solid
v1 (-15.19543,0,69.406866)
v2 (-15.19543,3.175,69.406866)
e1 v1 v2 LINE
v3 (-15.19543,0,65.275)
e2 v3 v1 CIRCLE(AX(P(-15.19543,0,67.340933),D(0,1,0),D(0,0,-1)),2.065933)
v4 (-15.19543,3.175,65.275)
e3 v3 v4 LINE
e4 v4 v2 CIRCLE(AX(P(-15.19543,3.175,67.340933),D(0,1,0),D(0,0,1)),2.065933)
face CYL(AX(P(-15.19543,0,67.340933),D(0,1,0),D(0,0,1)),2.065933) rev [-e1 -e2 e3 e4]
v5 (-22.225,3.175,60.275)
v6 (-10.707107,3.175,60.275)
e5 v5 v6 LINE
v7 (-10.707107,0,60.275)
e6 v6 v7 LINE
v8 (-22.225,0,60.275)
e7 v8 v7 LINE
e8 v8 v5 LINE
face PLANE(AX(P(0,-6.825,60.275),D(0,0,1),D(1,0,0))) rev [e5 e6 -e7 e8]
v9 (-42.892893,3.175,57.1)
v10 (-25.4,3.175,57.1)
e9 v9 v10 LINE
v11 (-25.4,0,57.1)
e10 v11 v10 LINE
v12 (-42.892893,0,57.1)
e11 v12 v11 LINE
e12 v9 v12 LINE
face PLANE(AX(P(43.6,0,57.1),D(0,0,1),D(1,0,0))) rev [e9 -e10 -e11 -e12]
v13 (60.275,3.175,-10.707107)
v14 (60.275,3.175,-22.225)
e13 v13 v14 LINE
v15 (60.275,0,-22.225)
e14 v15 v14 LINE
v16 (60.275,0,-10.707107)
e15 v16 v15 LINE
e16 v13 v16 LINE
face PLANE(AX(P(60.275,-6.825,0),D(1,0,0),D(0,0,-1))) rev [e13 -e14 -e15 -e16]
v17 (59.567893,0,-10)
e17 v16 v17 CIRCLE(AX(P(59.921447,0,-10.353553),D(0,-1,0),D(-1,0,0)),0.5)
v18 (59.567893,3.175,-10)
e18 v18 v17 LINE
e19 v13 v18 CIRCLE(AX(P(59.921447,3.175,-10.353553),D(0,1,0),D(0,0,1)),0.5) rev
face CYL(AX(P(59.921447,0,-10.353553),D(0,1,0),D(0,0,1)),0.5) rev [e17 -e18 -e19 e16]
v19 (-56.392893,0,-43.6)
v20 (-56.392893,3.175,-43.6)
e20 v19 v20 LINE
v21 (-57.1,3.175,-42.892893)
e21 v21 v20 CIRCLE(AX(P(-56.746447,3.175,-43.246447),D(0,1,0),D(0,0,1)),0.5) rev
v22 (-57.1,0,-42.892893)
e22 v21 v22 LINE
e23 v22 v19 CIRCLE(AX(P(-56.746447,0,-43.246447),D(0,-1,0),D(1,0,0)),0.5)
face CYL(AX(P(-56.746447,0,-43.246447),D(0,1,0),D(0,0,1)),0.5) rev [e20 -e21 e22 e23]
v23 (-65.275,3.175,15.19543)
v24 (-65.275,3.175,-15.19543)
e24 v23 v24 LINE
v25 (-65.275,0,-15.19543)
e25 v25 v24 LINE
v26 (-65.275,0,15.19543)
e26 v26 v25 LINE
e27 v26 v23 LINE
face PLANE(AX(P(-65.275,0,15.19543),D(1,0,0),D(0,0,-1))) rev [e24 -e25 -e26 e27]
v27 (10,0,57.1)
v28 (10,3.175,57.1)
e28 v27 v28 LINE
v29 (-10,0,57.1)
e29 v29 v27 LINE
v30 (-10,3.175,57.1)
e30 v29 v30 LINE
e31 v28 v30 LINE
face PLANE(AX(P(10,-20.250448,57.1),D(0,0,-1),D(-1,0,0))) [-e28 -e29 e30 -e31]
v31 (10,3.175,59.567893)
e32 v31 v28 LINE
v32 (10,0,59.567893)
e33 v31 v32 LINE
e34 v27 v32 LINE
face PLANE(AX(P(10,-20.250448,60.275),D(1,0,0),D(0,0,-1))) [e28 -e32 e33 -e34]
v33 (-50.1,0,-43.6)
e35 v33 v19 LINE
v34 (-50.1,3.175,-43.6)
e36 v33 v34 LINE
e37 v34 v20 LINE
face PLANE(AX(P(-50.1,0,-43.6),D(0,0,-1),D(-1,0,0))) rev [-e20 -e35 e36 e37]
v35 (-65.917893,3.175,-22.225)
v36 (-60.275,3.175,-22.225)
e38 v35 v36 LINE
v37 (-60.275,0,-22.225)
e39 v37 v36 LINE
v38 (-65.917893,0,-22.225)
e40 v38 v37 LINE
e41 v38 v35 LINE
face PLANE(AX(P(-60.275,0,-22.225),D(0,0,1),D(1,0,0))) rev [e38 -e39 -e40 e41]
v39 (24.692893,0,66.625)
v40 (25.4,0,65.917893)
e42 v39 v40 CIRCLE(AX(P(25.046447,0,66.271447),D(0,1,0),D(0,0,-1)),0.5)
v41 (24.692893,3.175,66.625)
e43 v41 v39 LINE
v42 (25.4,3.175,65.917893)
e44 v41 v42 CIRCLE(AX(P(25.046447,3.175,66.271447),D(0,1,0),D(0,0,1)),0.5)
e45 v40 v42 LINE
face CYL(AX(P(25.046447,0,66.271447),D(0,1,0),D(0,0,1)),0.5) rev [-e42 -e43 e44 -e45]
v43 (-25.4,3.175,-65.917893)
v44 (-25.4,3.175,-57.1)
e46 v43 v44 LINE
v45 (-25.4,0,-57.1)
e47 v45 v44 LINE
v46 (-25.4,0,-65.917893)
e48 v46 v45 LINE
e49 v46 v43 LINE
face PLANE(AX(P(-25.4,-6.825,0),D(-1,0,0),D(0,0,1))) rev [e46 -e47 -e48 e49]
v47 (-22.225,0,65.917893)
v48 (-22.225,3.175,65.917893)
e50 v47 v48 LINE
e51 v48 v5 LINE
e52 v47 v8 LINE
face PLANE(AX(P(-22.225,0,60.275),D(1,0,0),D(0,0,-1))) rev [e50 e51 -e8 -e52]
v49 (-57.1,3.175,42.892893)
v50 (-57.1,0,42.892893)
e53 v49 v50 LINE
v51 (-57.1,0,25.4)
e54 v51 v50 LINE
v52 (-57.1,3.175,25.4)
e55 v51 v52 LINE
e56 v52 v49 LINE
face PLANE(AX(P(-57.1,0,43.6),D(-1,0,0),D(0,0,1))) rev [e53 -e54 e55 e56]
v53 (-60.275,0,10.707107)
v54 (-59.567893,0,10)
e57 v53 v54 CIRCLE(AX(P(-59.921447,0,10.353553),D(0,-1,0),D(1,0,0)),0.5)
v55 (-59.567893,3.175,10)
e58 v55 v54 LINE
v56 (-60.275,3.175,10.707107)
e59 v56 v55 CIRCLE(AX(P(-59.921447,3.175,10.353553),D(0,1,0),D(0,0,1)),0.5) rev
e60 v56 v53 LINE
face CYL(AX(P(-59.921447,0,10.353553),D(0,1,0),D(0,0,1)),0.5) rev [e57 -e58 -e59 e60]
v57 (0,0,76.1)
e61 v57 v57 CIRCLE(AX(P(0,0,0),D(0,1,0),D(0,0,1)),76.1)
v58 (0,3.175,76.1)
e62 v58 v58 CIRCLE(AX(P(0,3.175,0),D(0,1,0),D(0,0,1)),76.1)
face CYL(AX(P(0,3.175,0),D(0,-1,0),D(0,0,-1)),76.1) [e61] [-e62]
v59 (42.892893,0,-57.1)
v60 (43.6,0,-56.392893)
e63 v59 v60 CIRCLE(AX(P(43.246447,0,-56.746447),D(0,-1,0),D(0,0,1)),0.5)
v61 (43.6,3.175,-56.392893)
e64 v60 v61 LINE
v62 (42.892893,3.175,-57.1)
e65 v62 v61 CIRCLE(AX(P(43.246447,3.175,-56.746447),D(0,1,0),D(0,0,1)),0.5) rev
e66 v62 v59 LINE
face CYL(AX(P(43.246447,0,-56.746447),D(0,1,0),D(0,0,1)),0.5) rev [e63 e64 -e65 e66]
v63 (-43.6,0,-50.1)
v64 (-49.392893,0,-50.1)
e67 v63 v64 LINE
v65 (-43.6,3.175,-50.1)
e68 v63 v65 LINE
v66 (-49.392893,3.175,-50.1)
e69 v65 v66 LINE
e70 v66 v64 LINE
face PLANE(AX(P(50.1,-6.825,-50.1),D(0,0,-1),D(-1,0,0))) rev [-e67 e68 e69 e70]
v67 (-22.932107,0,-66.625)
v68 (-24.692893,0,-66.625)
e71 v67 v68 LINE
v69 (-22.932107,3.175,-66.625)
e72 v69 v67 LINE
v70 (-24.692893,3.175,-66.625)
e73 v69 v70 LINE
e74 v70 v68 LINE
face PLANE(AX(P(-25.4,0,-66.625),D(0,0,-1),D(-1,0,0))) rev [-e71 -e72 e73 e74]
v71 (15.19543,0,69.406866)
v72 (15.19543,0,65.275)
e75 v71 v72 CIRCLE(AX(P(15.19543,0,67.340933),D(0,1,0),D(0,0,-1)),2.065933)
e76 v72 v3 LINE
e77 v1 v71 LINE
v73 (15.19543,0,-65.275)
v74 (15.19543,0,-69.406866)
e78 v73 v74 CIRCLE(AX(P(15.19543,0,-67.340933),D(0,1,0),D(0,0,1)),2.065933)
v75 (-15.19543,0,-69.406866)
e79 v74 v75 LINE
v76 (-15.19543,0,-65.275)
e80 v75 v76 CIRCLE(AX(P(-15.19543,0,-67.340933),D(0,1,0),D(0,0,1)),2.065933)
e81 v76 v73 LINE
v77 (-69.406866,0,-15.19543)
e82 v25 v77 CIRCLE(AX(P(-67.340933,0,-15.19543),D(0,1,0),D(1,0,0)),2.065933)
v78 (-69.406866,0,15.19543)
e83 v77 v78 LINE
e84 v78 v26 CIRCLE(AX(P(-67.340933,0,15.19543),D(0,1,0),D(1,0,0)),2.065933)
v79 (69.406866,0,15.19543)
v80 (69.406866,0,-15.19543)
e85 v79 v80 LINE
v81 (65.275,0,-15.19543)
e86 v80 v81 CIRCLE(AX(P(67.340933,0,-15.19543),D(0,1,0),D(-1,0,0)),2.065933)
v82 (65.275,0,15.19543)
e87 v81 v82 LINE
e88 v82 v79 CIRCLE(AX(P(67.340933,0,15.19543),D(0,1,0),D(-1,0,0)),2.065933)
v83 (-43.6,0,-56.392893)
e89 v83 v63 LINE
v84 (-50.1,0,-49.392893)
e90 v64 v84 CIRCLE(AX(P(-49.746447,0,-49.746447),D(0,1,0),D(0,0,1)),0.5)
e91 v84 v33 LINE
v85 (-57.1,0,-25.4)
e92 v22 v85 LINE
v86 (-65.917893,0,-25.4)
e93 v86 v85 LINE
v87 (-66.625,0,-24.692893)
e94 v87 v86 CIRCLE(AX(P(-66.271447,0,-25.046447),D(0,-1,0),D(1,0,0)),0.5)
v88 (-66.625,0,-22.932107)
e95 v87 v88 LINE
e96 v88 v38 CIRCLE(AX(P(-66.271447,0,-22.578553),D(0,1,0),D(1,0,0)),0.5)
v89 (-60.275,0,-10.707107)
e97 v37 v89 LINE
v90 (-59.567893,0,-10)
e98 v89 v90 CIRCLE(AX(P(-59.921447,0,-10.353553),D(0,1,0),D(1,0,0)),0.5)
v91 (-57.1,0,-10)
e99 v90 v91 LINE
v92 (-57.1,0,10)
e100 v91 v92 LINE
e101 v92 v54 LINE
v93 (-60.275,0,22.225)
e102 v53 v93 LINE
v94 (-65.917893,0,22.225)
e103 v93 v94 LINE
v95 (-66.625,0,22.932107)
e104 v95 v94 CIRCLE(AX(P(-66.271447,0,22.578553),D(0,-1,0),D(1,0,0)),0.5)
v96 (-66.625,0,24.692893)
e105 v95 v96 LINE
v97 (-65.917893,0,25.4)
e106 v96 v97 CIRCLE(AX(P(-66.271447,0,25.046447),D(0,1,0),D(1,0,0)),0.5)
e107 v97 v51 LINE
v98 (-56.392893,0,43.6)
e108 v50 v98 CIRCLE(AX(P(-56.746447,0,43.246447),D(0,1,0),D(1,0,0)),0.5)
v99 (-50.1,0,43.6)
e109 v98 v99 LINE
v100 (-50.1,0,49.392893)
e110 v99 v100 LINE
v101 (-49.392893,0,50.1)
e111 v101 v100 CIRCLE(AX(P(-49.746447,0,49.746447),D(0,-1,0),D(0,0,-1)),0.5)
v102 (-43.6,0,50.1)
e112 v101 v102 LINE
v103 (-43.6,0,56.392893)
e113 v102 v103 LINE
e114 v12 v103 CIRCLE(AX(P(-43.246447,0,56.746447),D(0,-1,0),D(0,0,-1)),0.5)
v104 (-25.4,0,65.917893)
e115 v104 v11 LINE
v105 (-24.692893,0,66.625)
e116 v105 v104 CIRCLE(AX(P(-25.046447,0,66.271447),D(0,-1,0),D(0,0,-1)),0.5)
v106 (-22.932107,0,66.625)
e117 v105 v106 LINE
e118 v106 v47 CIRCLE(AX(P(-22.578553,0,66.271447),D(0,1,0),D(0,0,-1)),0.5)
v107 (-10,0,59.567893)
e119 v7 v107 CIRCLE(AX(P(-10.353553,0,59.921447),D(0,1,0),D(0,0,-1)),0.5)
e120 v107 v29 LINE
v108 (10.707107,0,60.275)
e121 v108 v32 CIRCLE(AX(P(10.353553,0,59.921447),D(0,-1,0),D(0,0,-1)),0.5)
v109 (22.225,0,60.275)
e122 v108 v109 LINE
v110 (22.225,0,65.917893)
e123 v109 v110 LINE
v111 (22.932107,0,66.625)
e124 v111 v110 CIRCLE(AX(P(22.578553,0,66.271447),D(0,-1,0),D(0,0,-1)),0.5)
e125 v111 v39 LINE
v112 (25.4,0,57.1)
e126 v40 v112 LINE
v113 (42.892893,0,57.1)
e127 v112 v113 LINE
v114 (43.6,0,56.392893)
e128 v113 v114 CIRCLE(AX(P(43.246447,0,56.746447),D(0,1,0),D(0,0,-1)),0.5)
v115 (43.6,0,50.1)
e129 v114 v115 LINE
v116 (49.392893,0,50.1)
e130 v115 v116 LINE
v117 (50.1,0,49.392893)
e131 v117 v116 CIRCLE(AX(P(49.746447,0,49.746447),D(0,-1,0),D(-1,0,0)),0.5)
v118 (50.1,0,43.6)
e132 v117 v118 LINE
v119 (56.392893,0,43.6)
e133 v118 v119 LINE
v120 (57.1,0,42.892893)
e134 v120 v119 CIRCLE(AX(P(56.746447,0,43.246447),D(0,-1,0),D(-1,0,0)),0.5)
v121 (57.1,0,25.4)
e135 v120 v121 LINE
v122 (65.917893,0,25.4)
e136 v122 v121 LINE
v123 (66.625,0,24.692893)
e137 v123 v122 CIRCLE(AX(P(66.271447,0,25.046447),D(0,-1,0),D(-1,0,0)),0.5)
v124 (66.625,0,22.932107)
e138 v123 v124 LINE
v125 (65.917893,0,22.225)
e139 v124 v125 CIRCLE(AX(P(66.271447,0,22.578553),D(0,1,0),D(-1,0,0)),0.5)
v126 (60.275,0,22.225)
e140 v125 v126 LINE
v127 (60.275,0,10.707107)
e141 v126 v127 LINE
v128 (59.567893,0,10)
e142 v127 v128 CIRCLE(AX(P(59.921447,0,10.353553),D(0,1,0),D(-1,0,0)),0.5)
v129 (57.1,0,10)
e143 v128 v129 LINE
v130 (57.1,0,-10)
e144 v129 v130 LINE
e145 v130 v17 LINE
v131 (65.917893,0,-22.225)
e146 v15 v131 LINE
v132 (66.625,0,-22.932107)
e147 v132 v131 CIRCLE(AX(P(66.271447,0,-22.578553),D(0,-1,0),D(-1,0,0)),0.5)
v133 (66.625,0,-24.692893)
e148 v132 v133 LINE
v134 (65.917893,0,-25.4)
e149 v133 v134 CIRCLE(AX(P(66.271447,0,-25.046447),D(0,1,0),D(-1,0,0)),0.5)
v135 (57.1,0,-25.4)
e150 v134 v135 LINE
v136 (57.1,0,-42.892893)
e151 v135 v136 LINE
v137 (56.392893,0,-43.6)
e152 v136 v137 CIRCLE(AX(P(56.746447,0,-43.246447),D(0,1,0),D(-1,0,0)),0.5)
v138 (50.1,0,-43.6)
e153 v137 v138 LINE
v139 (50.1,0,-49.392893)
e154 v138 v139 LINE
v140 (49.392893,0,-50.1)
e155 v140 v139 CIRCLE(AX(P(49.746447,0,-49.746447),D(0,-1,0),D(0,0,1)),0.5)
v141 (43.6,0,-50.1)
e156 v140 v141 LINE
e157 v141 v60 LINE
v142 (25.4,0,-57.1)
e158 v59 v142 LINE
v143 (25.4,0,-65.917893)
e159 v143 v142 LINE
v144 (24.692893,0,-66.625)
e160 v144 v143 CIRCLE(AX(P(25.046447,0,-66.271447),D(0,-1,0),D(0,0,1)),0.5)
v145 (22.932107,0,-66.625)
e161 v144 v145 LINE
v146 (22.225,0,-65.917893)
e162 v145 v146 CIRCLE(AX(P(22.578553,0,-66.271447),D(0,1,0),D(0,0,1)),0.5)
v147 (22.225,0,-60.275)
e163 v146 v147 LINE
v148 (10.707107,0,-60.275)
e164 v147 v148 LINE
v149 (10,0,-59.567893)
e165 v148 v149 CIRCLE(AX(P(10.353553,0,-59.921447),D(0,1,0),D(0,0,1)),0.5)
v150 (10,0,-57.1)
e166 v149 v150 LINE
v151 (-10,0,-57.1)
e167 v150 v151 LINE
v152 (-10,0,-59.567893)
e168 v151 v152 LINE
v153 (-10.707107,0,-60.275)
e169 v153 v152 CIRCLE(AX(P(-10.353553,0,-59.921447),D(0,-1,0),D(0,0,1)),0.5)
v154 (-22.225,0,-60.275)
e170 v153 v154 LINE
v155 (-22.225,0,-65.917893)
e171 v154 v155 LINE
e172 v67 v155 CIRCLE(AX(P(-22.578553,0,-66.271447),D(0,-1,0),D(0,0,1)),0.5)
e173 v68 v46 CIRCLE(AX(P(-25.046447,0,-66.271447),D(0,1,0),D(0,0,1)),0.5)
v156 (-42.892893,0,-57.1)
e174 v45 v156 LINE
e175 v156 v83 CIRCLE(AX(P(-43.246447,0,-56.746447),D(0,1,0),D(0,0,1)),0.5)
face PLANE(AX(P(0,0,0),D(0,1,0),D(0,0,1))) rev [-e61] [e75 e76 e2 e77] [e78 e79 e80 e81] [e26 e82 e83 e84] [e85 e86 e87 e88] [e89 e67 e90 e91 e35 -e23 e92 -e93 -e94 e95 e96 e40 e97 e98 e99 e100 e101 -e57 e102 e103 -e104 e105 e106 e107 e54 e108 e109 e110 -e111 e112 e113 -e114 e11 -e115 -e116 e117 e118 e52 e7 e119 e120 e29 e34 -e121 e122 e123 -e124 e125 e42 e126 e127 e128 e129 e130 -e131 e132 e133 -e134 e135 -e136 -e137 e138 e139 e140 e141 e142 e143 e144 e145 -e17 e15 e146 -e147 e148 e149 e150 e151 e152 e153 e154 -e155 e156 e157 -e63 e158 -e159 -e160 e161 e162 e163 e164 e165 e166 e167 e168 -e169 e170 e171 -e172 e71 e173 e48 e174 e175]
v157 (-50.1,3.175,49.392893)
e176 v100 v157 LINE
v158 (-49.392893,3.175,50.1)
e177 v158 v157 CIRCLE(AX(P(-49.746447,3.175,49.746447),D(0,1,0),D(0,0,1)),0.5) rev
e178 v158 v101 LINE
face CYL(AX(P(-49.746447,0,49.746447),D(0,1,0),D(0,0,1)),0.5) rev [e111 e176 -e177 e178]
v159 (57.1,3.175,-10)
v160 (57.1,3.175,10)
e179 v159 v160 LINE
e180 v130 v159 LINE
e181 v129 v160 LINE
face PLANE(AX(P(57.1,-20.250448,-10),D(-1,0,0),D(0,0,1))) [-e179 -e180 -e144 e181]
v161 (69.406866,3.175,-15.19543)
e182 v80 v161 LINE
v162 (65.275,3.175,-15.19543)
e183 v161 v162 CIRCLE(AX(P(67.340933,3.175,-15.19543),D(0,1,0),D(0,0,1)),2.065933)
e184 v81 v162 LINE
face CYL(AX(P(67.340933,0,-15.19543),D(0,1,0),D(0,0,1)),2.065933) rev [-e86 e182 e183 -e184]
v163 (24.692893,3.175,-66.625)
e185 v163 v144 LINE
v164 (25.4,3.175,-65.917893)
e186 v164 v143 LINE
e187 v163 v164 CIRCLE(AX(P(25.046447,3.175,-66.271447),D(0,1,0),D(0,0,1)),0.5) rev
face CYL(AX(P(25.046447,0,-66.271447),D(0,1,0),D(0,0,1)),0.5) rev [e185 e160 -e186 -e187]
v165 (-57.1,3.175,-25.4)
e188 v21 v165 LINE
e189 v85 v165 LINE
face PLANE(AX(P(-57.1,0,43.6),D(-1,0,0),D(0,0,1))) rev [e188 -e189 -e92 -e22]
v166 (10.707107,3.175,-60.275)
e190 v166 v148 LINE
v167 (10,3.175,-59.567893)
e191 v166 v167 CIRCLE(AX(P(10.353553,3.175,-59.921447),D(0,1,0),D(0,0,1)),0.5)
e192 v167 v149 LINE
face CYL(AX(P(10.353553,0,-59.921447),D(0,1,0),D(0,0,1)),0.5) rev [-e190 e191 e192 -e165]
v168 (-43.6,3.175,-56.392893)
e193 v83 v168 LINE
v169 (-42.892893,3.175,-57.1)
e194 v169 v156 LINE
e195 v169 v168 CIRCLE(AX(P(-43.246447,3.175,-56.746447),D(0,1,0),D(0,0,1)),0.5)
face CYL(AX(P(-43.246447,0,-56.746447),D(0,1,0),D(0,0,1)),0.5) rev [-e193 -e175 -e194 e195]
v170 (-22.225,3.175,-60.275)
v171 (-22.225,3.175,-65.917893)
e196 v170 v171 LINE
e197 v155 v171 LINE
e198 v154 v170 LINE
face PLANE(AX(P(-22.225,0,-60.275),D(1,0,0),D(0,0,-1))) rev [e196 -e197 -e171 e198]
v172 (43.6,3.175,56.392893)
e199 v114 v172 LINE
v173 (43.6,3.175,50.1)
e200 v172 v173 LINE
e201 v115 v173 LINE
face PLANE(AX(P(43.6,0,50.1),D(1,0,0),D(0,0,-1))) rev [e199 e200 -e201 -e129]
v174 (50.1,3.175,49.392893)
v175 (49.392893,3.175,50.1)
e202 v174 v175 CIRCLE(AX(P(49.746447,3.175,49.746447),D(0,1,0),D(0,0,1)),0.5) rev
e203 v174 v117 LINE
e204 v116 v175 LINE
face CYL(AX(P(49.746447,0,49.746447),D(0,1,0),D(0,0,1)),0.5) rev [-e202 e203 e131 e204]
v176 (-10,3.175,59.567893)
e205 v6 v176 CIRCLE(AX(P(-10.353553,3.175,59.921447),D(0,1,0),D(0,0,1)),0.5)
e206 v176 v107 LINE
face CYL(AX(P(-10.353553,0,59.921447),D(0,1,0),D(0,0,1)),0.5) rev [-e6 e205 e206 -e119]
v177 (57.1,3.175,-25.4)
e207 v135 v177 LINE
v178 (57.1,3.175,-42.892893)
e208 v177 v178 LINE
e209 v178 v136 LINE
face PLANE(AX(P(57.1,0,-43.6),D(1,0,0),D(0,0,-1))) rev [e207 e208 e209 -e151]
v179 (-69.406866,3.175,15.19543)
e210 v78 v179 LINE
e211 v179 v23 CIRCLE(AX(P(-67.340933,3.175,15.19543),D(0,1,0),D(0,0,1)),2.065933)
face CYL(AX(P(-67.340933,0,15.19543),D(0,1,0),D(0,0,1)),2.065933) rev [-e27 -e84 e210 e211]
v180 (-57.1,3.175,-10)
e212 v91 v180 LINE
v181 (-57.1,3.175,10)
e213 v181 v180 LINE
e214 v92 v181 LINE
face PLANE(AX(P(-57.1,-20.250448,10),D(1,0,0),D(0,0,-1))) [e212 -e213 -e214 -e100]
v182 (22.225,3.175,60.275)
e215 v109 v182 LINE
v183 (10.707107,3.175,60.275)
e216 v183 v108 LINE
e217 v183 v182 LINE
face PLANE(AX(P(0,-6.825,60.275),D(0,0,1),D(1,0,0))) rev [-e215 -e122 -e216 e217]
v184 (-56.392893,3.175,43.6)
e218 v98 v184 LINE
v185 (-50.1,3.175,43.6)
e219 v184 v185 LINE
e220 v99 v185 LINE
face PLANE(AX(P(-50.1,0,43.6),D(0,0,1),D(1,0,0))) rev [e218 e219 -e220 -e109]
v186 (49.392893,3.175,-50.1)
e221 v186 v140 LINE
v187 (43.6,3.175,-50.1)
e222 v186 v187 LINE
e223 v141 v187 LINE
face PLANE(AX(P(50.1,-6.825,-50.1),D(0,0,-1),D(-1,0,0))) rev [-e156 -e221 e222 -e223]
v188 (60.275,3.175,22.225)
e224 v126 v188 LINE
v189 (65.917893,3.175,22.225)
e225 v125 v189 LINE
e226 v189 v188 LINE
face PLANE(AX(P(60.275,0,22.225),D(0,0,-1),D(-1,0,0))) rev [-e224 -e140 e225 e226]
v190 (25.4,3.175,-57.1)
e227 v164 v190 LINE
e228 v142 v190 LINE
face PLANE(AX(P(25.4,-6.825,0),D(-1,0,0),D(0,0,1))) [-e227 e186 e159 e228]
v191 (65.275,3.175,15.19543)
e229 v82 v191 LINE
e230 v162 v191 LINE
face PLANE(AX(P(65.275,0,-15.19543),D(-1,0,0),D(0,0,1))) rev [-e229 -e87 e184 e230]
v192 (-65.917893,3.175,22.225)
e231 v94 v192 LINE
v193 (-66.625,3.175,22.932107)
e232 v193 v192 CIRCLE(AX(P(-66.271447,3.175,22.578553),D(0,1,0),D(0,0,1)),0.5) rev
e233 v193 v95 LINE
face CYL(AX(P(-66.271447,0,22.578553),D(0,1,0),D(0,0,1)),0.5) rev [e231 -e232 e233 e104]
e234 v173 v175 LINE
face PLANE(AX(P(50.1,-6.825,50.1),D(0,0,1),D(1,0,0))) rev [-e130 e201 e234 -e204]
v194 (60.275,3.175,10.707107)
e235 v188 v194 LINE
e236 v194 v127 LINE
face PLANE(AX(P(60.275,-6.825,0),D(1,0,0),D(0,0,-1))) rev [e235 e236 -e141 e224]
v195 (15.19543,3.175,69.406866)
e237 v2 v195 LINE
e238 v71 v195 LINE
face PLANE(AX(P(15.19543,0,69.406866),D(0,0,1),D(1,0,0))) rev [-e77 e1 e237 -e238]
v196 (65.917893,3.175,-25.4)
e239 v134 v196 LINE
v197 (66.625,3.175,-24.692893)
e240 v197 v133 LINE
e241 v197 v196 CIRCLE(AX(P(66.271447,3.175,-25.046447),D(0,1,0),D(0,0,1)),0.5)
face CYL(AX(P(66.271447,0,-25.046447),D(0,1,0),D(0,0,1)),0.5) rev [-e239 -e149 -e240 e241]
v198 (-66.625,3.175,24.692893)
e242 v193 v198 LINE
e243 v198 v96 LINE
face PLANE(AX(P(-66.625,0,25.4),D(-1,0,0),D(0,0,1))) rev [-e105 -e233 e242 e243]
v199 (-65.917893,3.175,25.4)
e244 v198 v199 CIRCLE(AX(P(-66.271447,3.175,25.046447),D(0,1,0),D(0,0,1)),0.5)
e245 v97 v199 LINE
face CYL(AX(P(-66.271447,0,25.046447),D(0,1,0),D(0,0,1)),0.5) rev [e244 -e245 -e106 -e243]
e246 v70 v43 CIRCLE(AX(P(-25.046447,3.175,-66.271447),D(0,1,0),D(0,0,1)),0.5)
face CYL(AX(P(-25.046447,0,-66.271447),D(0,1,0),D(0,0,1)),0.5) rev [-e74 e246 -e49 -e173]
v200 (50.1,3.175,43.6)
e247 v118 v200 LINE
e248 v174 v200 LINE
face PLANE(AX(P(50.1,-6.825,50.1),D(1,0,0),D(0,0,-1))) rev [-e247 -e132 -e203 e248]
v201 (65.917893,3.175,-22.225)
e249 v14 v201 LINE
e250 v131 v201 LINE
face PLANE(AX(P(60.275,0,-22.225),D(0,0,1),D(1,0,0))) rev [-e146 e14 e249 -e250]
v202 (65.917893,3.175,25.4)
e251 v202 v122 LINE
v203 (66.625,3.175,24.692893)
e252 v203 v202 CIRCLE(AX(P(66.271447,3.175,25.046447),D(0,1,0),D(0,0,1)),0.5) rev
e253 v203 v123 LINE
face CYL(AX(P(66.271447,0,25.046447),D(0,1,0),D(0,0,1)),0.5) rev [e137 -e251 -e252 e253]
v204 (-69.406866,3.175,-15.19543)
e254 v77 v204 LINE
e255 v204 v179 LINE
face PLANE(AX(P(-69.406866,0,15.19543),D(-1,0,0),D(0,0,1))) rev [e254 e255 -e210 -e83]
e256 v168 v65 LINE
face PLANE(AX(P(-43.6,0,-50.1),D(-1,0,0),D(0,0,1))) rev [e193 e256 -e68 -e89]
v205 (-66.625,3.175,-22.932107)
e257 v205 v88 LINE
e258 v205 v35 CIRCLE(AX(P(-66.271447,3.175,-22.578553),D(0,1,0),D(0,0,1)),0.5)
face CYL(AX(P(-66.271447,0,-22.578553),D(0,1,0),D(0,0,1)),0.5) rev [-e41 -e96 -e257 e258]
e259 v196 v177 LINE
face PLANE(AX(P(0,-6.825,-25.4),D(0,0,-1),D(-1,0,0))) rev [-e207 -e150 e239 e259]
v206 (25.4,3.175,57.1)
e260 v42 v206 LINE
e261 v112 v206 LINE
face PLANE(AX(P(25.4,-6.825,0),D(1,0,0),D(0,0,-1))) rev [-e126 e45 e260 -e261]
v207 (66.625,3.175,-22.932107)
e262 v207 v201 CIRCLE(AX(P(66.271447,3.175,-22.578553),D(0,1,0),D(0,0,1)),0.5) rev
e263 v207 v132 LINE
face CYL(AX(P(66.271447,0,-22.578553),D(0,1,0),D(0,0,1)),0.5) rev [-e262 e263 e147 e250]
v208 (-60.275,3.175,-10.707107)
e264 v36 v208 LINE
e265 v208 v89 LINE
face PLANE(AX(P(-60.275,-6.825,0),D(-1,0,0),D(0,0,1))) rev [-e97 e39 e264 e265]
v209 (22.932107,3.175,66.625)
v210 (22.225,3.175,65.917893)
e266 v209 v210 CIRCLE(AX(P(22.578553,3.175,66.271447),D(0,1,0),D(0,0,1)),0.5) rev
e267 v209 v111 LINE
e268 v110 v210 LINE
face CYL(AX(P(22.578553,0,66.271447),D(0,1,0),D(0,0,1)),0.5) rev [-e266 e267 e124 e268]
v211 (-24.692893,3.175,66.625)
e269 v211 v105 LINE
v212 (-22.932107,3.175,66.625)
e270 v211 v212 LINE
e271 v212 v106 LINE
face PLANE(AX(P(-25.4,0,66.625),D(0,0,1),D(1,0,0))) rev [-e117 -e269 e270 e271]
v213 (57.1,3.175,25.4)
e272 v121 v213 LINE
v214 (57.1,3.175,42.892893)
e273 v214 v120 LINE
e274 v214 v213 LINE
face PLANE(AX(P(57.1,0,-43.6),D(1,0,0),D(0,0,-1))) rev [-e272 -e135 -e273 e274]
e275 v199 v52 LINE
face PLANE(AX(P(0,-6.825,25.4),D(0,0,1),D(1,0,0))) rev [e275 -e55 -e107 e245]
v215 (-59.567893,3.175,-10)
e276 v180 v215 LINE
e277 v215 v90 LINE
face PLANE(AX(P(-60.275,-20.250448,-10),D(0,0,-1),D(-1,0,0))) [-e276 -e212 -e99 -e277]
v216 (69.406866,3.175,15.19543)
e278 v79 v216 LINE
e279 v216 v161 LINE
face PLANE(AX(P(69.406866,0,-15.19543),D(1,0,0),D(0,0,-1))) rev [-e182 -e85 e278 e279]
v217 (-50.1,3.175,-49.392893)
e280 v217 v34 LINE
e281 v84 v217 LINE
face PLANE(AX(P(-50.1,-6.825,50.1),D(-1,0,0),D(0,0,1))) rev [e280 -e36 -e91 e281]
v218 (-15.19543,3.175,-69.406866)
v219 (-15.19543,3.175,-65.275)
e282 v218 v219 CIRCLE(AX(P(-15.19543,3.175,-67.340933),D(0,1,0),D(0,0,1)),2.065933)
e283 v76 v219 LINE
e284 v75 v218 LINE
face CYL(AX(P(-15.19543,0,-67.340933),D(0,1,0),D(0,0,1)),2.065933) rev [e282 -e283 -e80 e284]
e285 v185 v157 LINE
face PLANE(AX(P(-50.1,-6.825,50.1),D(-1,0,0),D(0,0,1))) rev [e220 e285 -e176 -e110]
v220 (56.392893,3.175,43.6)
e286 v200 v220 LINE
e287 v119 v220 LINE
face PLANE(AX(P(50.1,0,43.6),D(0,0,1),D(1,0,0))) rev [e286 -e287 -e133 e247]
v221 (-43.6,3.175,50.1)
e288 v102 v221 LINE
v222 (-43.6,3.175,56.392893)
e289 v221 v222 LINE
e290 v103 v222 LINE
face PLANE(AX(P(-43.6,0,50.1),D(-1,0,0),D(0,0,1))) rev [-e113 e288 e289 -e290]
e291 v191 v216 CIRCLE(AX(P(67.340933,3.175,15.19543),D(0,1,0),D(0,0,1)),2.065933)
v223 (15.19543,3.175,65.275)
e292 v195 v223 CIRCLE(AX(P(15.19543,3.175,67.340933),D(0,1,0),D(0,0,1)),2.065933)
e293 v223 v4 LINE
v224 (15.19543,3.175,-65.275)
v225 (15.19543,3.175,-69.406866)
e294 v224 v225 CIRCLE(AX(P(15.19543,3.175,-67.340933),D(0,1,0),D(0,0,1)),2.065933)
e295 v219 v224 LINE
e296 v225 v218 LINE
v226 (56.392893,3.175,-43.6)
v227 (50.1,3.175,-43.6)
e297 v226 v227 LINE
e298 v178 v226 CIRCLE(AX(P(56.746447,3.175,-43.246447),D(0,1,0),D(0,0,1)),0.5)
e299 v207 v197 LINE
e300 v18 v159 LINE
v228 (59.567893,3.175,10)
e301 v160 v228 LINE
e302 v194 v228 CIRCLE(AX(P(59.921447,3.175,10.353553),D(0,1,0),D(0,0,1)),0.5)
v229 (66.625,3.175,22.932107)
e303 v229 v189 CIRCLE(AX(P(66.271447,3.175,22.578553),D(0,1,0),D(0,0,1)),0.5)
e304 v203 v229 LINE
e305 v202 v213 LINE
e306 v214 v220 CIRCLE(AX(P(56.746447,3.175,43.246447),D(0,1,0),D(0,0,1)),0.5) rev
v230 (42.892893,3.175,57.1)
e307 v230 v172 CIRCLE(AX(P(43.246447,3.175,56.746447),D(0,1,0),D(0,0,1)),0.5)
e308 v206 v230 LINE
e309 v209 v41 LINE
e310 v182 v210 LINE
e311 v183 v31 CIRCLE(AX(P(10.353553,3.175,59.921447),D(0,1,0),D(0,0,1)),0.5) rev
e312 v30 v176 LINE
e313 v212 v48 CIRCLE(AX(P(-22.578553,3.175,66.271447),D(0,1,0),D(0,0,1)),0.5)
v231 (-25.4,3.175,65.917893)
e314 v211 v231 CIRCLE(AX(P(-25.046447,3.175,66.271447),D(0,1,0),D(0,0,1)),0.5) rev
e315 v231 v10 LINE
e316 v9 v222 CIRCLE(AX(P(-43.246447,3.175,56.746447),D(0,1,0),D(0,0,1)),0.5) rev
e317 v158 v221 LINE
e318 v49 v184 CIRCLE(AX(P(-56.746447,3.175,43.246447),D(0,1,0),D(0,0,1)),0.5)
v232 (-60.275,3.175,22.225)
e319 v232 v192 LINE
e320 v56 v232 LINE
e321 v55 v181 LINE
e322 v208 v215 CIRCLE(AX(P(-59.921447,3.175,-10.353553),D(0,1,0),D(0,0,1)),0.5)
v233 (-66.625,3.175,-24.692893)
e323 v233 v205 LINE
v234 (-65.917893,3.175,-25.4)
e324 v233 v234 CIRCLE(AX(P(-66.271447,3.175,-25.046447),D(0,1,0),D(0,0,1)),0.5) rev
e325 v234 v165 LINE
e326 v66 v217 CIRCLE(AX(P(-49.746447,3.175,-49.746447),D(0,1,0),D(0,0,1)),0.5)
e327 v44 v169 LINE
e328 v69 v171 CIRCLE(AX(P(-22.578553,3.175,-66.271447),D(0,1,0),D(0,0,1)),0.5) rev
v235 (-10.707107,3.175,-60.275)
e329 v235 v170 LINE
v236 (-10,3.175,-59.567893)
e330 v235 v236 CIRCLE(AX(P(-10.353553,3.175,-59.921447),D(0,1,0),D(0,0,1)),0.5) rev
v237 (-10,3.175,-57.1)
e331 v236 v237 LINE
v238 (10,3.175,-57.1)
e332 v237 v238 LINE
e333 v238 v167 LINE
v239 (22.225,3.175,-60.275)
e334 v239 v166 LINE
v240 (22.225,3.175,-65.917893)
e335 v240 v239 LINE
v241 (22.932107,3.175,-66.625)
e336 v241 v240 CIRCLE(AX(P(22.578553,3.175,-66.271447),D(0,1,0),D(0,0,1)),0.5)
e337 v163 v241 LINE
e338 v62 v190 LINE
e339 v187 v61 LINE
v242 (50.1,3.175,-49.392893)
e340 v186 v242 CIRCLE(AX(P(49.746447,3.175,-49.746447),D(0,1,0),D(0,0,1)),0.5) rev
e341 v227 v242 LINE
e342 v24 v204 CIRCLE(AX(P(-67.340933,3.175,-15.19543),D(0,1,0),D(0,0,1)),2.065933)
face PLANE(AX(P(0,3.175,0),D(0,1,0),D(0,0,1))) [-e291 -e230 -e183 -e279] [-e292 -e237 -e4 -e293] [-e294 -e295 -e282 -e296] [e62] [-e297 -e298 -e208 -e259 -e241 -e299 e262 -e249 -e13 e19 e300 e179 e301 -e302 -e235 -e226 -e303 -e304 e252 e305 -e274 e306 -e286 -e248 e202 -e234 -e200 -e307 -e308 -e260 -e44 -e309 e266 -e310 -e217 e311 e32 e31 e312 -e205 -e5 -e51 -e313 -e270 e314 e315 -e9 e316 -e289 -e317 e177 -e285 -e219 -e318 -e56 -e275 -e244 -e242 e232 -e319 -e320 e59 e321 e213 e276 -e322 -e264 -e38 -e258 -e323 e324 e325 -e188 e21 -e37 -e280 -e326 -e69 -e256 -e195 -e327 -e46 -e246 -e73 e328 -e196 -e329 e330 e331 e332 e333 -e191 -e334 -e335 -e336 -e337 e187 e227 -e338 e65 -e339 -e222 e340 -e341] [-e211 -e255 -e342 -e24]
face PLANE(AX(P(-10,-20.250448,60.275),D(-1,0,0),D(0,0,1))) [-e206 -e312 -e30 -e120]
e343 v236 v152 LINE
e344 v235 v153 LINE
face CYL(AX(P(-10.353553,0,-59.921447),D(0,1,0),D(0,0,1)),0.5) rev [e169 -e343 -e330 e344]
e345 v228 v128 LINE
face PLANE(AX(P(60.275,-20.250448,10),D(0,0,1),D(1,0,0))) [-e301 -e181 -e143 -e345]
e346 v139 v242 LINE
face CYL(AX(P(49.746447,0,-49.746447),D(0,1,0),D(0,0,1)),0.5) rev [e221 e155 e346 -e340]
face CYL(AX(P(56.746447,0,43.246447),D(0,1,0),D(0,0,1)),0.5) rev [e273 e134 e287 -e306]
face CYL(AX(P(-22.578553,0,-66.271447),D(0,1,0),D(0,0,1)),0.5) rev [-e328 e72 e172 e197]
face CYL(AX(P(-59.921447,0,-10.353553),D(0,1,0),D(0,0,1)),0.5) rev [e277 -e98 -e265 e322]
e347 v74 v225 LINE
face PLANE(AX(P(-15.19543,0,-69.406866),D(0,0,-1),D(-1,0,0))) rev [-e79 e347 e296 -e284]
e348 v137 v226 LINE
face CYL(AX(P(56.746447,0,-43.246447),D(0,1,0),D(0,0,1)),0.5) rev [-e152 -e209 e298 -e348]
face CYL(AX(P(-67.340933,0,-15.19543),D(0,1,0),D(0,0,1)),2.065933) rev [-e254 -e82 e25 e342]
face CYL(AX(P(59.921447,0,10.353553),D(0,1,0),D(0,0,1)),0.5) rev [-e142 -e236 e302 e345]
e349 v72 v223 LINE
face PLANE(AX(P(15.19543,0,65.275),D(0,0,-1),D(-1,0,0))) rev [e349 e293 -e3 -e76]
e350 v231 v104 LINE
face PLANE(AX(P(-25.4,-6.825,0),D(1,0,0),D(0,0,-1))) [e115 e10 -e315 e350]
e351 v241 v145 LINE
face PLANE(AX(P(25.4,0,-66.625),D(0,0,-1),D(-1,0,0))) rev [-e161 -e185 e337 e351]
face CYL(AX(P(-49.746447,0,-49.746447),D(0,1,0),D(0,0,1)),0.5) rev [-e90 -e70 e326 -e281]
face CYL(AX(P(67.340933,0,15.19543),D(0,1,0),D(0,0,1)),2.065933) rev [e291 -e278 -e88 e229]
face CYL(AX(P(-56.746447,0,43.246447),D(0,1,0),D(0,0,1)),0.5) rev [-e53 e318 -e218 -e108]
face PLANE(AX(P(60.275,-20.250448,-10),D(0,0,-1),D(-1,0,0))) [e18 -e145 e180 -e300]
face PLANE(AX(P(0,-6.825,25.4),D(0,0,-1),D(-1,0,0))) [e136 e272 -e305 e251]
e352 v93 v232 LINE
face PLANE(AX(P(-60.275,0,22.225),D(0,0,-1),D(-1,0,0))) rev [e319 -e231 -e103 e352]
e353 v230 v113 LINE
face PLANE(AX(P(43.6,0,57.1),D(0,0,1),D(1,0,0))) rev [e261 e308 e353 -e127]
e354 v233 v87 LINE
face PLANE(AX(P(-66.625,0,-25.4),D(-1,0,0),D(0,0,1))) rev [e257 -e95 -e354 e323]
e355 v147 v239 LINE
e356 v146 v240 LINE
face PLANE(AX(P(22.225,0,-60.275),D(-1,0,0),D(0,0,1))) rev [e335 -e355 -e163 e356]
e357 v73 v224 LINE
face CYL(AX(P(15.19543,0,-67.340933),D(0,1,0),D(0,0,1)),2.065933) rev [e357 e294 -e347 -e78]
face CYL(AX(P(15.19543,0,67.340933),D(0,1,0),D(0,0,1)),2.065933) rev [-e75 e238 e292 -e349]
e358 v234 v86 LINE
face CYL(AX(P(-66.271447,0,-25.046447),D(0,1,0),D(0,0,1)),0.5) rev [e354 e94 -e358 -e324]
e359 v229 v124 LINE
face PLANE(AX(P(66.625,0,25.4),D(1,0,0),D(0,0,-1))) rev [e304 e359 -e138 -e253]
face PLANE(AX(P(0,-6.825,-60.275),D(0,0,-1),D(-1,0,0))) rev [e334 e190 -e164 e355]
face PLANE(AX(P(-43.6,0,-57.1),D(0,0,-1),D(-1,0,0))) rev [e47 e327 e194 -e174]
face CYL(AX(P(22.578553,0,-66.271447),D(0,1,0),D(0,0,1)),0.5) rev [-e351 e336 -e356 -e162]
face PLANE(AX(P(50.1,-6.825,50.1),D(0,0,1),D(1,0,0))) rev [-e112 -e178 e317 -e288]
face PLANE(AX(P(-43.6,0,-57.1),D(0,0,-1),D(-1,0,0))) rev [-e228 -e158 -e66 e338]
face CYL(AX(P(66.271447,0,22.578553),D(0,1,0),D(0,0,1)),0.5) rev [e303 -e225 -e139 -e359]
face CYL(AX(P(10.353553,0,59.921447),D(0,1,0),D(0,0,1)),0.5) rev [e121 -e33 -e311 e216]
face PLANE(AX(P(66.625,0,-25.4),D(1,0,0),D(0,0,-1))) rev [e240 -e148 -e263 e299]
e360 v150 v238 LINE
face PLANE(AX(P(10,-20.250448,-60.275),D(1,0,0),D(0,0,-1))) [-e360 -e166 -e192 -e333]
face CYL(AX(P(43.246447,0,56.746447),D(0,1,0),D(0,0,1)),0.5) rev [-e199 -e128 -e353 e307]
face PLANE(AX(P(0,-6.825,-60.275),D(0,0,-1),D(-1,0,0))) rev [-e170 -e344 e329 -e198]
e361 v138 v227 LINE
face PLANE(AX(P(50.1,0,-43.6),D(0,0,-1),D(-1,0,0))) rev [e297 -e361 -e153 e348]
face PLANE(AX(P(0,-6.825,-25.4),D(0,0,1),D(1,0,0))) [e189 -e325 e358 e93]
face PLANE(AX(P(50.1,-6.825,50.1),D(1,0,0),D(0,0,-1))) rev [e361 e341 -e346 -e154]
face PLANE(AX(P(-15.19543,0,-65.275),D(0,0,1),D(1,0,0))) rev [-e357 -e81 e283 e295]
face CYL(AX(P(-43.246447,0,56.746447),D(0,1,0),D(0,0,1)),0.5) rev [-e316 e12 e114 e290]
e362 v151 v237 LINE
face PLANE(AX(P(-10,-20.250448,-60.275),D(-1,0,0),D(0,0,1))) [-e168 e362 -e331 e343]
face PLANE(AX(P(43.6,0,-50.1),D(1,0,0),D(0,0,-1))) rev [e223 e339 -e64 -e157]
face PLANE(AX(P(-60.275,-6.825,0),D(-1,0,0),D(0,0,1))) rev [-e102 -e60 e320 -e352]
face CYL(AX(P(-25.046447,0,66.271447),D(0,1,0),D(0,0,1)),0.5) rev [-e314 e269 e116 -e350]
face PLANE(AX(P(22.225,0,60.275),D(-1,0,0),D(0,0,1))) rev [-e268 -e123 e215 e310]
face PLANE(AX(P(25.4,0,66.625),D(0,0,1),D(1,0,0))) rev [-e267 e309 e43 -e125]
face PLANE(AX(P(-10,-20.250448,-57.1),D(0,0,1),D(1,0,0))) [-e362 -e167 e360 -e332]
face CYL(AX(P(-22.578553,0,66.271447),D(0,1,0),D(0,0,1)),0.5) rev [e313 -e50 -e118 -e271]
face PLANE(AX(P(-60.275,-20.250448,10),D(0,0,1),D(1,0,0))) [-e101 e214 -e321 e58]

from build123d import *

# Parameters (mm, degrees)
SKETCH1_R                   = 76.1
BOSS_EXTRUDE1_DEPTH         = 3.175
SKETCH6_W                   = 100.2
SKETCH6_H                   = 100.2
RAILCUTOUT_DEPTH            = 10
SKETCH12_W                  = 87.2
SKETCH12_H                  = 7
SOLARCUTOUTS_DEPTH          = 108.66847554
SKETCH17_W                  = 50.8
SKETCH17_H                  = 3.175
WALLCUTOUT_DEPTH            = 10
SKETCH26_W                  = 20
SKETCH26_H                  = 3.175
BOSS_EXTRUDE5_DEPTH         = 3.175
SKETCH23_W                  = 3.175
SKETCH23_H                  = 6.35
RIBHOLES_DEPTH              = 108.66847554
WIREHOLE_DEPTH              = 108.66847554
SKETCH21_R                  = 0.5
BONESEED_DEPTH              = 108.66847554
SKETCH_PATTERN1_DEPTH       = 3.175
CIRPATTERN1_COUNT           = 4
CIRPATTERN1_COPY_1_SKETCH_R = 0.5
CIRPATTERN1_COPY_1_DEPTH    = 108.66847554
CIRPATTERN1_COPY_2_SKETCH_R = 0.5
CIRPATTERN1_COPY_2_DEPTH    = 108.66847554
CIRPATTERN1_COPY_3_SKETCH_R = 0.5
CIRPATTERN1_COPY_3_DEPTH    = 108.66847554
CIRPATTERN1_COPY_4_DEPTH    = 3.175
CIRPATTERN1_COPY_5_DEPTH    = 3.175
CIRPATTERN1_COPY_6_DEPTH    = 3.175
CIRPATTERN1_COPY_7_SKETCH_R = 0.5
CIRPATTERN1_COPY_7_DEPTH    = 108.66847554
CIRPATTERN1_COPY_8_SKETCH_R = 0.5
CIRPATTERN1_COPY_8_DEPTH    = 108.66847554
CIRPATTERN1_COPY_9_SKETCH_R = 0.5
CIRPATTERN1_COPY_9_DEPTH    = 108.66847554


# Read off the part's stored shape, not the designer's step: Sketch-Pattern1
with BuildPart() as part:
    # Sketch1 → Boss-Extrude1 (new body)
    with BuildSketch(Plane(origin=(0, 0, 0), x_dir=(1, 0, 0), z_dir=(0, 1, 0))):
        with Locations(Location((0, 0, 0), (0, 0, 270))):
            Circle(SKETCH1_R)
    extrude(amount=BOSS_EXTRUDE1_DEPTH)

    # Sketch6 → railCutout (cut)
    with BuildSketch(Plane(origin=(0, 3.175, 0), x_dir=(1, 0, 0), z_dir=(0, 1, 0))):
        Rectangle(SKETCH6_W, SKETCH6_H)
    extrude(amount=-RAILCUTOUT_DEPTH, mode=Mode.SUBTRACT)

    # Sketch12 → solarCutouts (cut, symmetric)
    with BuildSketch(Plane(origin=(0, 3.175, 0), x_dir=(1, 0, 0), z_dir=(0, 1, 0))):
        with Locations((0, 53.6)):
            Rectangle(SKETCH12_W, SKETCH12_H)
    solarcutouts = extrude(amount=SOLARCUTOUTS_DEPTH, both=True, mode=Mode.SUBTRACT)

    # Sketch17 → wallCutout (cut)
    with BuildSketch(Plane(origin=(0, 3.175, 0), x_dir=(1, 0, 0), z_dir=(0, 1, 0))):
        with Locations((0, 58.6875)):
            Rectangle(SKETCH17_W, SKETCH17_H)
    wallcutout = extrude(amount=-WALLCUTOUT_DEPTH, mode=Mode.SUBTRACT)

    # Sketch26 → Boss-Extrude5 (add)
    with BuildSketch(Plane(origin=(0, 3.175, 0), x_dir=(1, 0, 0), z_dir=(0, 1, 0))):
        with Locations((0, 58.6875)):
            Rectangle(SKETCH26_W, SKETCH26_H)
    boss_extrude5 = extrude(amount=-BOSS_EXTRUDE5_DEPTH)

    # Sketch23 → ribHoles (cut, symmetric)
    with BuildSketch(Plane(origin=(0, 3.175, 0), x_dir=(1, 0, 0), z_dir=(0, 1, 0))):
        with Locations((-23.8125, 63.45)):
            Rectangle(SKETCH23_W, SKETCH23_H)
        with Locations((23.8125, 63.45)):
            Rectangle(SKETCH23_W, SKETCH23_H)
    ribholes = extrude(amount=RIBHOLES_DEPTH, both=True, mode=Mode.SUBTRACT)

    # Sketch22 → wireHole (cut, symmetric)
    with BuildSketch(Plane(origin=(0, 3.175, 0), x_dir=(1, 0, 0), z_dir=(0, 1, 0))):
        with BuildLine():
            Line((-15.19543021, 69.406866366), (15.19543021, 69.406866366))
            ThreePointArc((15.19543021, 69.406866366), (17.261363394, 67.340933183), (15.19543021, 65.275))
            Line((15.19543021, 65.275), (-15.19543021, 65.275))
            ThreePointArc((-15.19543021, 65.275), (-17.261363394, 67.340933183), (-15.19543021, 69.406866366))
        make_face()
    wirehole = extrude(amount=WIREHOLE_DEPTH, both=True, mode=Mode.SUBTRACT)

    # Sketch21 → boneSeed (cut, symmetric)
    with BuildSketch(Plane(origin=(0, 3.175, 0), x_dir=(1, 0, 0), z_dir=(0, 1, 0))):
        with Locations((-49.746446609, 49.746446609)):
            Circle(SKETCH21_R)
    boneseed = extrude(amount=BONESEED_DEPTH, both=True, mode=Mode.SUBTRACT)

    # Sketch-Pattern1 outline → Sketch-Pattern1 (cut)
    with BuildSketch(Plane(origin=(0, 0, 0), x_dir=(1, 0, 0), z_dir=(0, 1, 0))):
        with BuildLine():
            Line((-25.4, 66.625), (-24.692893219, 66.625))
            ThreePointArc((-24.692893219, 66.625), (-25.046446609, 66.771446609), (-25.4, 66.625))
        make_face()
        with BuildLine():
            Line((-43.6, 56.392893219), (-43.6, 57.1))
            ThreePointArc((-43.6, 57.1), (-43.746446609, 56.746446609), (-43.6, 56.392893219))
        make_face()
        with BuildLine():
            Line((-43.6, 57.1), (-42.892893219, 57.1))
            ThreePointArc((-42.892893219, 57.1), (-43.246446609, 57.246446609), (-43.6, 57.1))
        make_face()
        with BuildLine():
            Line((-25.4, 65.917893219), (-25.4, 66.625))
            ThreePointArc((-25.4, 66.625), (-25.546446609, 66.27144661), (-25.4, 65.917893219))
        make_face()
        with BuildLine():
            Line((22.225, 66.625), (22.932106781, 66.625))
            ThreePointArc((22.932106781, 66.625), (22.578553391, 66.771446609), (22.225, 66.625))
        make_face()
        with BuildLine():
            Line((10, 59.567893219), (10, 60.275))
            ThreePointArc((10, 60.275), (9.853553391, 59.921446609), (10, 59.567893219))
        make_face()
        with BuildLine():
            Line((10, 60.275), (10.707106781, 60.275))
            ThreePointArc((10.707106781, 60.275), (10.353553391, 60.421446609), (10, 60.275))
        make_face()
        with BuildLine():
            Line((22.225, 65.917893219), (22.225, 66.625))
            ThreePointArc((22.225, 66.625), (22.078553391, 66.27144661), (22.225, 65.917893219))
        make_face()
    sketch_pattern1 = extrude(amount=SKETCH_PATTERN1_DEPTH, mode=Mode.SUBTRACT)

    # Mirror1: boneSeed, Sketch-Pattern1 across plane
    add(boneseed.mirror(Plane(origin=(0, 0, 0), x_dir=(0, 0, 1), z_dir=(1, 0, 0))), mode=Mode.SUBTRACT)
    add(sketch_pattern1.mirror(Plane(origin=(0, 0, 0), x_dir=(0, 0, 1), z_dir=(1, 0, 0))), mode=Mode.SUBTRACT)

    # CirPattern1: solarCutouts, wallCutout, Boss-Extrude5, ribHoles, wireHole, Sketch-Pattern1 ×4 about axis
    cirpattern1_axis = Axis((0, 0, 0), (0, 1, 0))
    add([solarcutouts.rotate(cirpattern1_axis, i * 360 / CIRPATTERN1_COUNT) for i in range(1, CIRPATTERN1_COUNT)], mode=Mode.SUBTRACT)
    add([wallcutout.rotate(cirpattern1_axis, i * 360 / CIRPATTERN1_COUNT) for i in range(1, CIRPATTERN1_COUNT)], mode=Mode.SUBTRACT)
    add([boss_extrude5.rotate(cirpattern1_axis, i * 360 / CIRPATTERN1_COUNT) for i in range(1, CIRPATTERN1_COUNT)])
    add([ribholes.rotate(cirpattern1_axis, i * 360 / CIRPATTERN1_COUNT) for i in range(1, CIRPATTERN1_COUNT)], mode=Mode.SUBTRACT)
    add([wirehole.rotate(cirpattern1_axis, i * 360 / CIRPATTERN1_COUNT) for i in range(1, CIRPATTERN1_COUNT)], mode=Mode.SUBTRACT)
    add([sketch_pattern1.rotate(cirpattern1_axis, i * 360 / CIRPATTERN1_COUNT) for i in range(1, CIRPATTERN1_COUNT)], mode=Mode.SUBTRACT)

    # CirPattern1 copy 1 sketch → CirPattern1 copy 1 (cut, symmetric)
    with BuildSketch(Plane.ZX.offset(3.175)):
        with Locations((-49.746446609, -49.746446609)):
            Circle(CIRPATTERN1_COPY_1_SKETCH_R)
    extrude(amount=CIRPATTERN1_COPY_1_DEPTH, both=True, mode=Mode.SUBTRACT)

    # CirPattern1 copy 2 sketch → CirPattern1 copy 2 (cut, symmetric)
    with BuildSketch(Plane(origin=(0, 3.175, 0), x_dir=(1, 0, 0), z_dir=(0, 1, 0))):
        with Locations((-49.746446609, -49.746446609)):
            Circle(CIRPATTERN1_COPY_2_SKETCH_R)
    extrude(amount=CIRPATTERN1_COPY_2_DEPTH, both=True, mode=Mode.SUBTRACT)

    # CirPattern1 copy 3 sketch → CirPattern1 copy 3 (cut, symmetric)
    with BuildSketch(Plane(origin=(0, 3.175, 0), x_dir=(0, 0, -1), z_dir=(0, 1, 0))):
        with Locations((-49.746446609, -49.746446609)):
            Circle(CIRPATTERN1_COPY_3_SKETCH_R)
    extrude(amount=CIRPATTERN1_COPY_3_DEPTH, both=True, mode=Mode.SUBTRACT)

    # CirPattern1 copy 4 sketch → CirPattern1 copy 4 (cut)
    with BuildSketch(Plane.ZX):
        with BuildLine():
            Line((-25.4, -66.625), (-24.692893219, -66.625))
            ThreePointArc((-24.692893219, -66.625), (-25.046446609, -66.771446609), (-25.4, -66.625))
        make_face()
        with BuildLine():
            Line((-43.6, -56.392893219), (-43.6, -57.1))
            ThreePointArc((-43.6, -57.1), (-43.746446609, -56.746446609), (-43.6, -56.392893219))
        make_face()
        with BuildLine():
            Line((-43.6, -57.1), (-42.892893219, -57.1))
            ThreePointArc((-42.892893219, -57.1), (-43.246446609, -57.246446609), (-43.6, -57.1))
        make_face()
        with BuildLine():
            Line((-25.4, -65.917893219), (-25.4, -66.625))
            ThreePointArc((-25.4, -66.625), (-25.546446609, -66.27144661), (-25.4, -65.917893219))
        make_face()
        with BuildLine():
            Line((22.225, -66.625), (22.932106781, -66.625))
            ThreePointArc((22.932106781, -66.625), (22.578553391, -66.771446609), (22.225, -66.625))
        make_face()
        with BuildLine():
            Line((10, -59.567893219), (10, -60.275))
            ThreePointArc((10, -60.275), (9.853553391, -59.921446609), (10, -59.567893219))
        make_face()
        with BuildLine():
            Line((10, -60.275), (10.707106781, -60.275))
            ThreePointArc((10.707106781, -60.275), (10.353553391, -60.421446609), (10, -60.275))
        make_face()
        with BuildLine():
            Line((22.225, -65.917893219), (22.225, -66.625))
            ThreePointArc((22.225, -66.625), (22.078553391, -66.27144661), (22.225, -65.917893219))
        make_face()
    extrude(amount=CIRPATTERN1_COPY_4_DEPTH, mode=Mode.SUBTRACT)

    # CirPattern1 copy 5 sketch → CirPattern1 copy 5 (cut)
    with BuildSketch(Plane(origin=(0, 0, 0), x_dir=(1, 0, 0), z_dir=(0, 1, 0))):
        with BuildLine():
            Line((-25.4, -66.625), (-24.692893219, -66.625))
            ThreePointArc((-24.692893219, -66.625), (-25.046446609, -66.771446609), (-25.4, -66.625))
        make_face()
        with BuildLine():
            Line((-43.6, -56.392893219), (-43.6, -57.1))
            ThreePointArc((-43.6, -57.1), (-43.746446609, -56.746446609), (-43.6, -56.392893219))
        make_face()
        with BuildLine():
            Line((-43.6, -57.1), (-42.892893219, -57.1))
            ThreePointArc((-42.892893219, -57.1), (-43.246446609, -57.246446609), (-43.6, -57.1))
        make_face()
        with BuildLine():
            Line((-25.4, -65.917893219), (-25.4, -66.625))
            ThreePointArc((-25.4, -66.625), (-25.546446609, -66.27144661), (-25.4, -65.917893219))
        make_face()
        with BuildLine():
            Line((22.225, -66.625), (22.932106781, -66.625))
            ThreePointArc((22.932106781, -66.625), (22.578553391, -66.771446609), (22.225, -66.625))
        make_face()
        with BuildLine():
            Line((10, -59.567893219), (10, -60.275))
            ThreePointArc((10, -60.275), (9.853553391, -59.921446609), (10, -59.567893219))
        make_face()
        with BuildLine():
            Line((10, -60.275), (10.707106781, -60.275))
            ThreePointArc((10.707106781, -60.275), (10.353553391, -60.421446609), (10, -60.275))
        make_face()
        with BuildLine():
            Line((22.225, -65.917893219), (22.225, -66.625))
            ThreePointArc((22.225, -66.625), (22.078553391, -66.27144661), (22.225, -65.917893219))
        make_face()
    extrude(amount=CIRPATTERN1_COPY_5_DEPTH, mode=Mode.SUBTRACT)

    # CirPattern1 copy 6 sketch → CirPattern1 copy 6 (cut)
    with BuildSketch(Plane(origin=(0, 0, 0), x_dir=(0, 0, -1), z_dir=(0, 1, 0))):
        with BuildLine():
            Line((-25.4, -66.625), (-24.692893219, -66.625))
            ThreePointArc((-24.692893219, -66.625), (-25.046446609, -66.771446609), (-25.4, -66.625))
        make_face()
        with BuildLine():
            Line((-43.6, -56.392893219), (-43.6, -57.1))
            ThreePointArc((-43.6, -57.1), (-43.746446609, -56.746446609), (-43.6, -56.392893219))
        make_face()
        with BuildLine():
            Line((-43.6, -57.1), (-42.892893219, -57.1))
            ThreePointArc((-42.892893219, -57.1), (-43.246446609, -57.246446609), (-43.6, -57.1))
        make_face()
        with BuildLine():
            Line((-25.4, -65.917893219), (-25.4, -66.625))
            ThreePointArc((-25.4, -66.625), (-25.546446609, -66.27144661), (-25.4, -65.917893219))
        make_face()
        with BuildLine():
            Line((22.225, -66.625), (22.932106781, -66.625))
            ThreePointArc((22.932106781, -66.625), (22.578553391, -66.771446609), (22.225, -66.625))
        make_face()
        with BuildLine():
            Line((10, -59.567893219), (10, -60.275))
            ThreePointArc((10, -60.275), (9.853553391, -59.921446609), (10, -59.567893219))
        make_face()
        with BuildLine():
            Line((10, -60.275), (10.707106781, -60.275))
            ThreePointArc((10.707106781, -60.275), (10.353553391, -60.421446609), (10, -60.275))
        make_face()
        with BuildLine():
            Line((22.225, -65.917893219), (22.225, -66.625))
            ThreePointArc((22.225, -66.625), (22.078553391, -66.27144661), (22.225, -65.917893219))
        make_face()
    extrude(amount=CIRPATTERN1_COPY_6_DEPTH, mode=Mode.SUBTRACT)

    # CirPattern1 copy 7 sketch → CirPattern1 copy 7 (cut, symmetric)
    with BuildSketch(Plane(origin=(0, 3.175, 0), x_dir=(0, 0, -1), z_dir=(0, 1, 0))):
        with Locations((-49.746446609, 49.746446609)):
            Circle(CIRPATTERN1_COPY_7_SKETCH_R)
    extrude(amount=CIRPATTERN1_COPY_7_DEPTH, both=True, mode=Mode.SUBTRACT)

    # CirPattern1 copy 8 sketch → CirPattern1 copy 8 (cut, symmetric)
    with BuildSketch(Plane(origin=(0, 3.175, 0), x_dir=(-1, 0, 0), z_dir=(0, 1, 0))):
        with Locations((-49.746446609, 49.746446609)):
            Circle(CIRPATTERN1_COPY_8_SKETCH_R)
    extrude(amount=CIRPATTERN1_COPY_8_DEPTH, both=True, mode=Mode.SUBTRACT)

    # CirPattern1 copy 9 sketch → CirPattern1 copy 9 (cut, symmetric)
    with BuildSketch(Plane.ZX.offset(3.175)):
        with Locations((-49.746446609, 49.746446609)):
            Circle(CIRPATTERN1_COPY_9_SKETCH_R)
    extrude(amount=CIRPATTERN1_COPY_9_DEPTH, both=True, mode=Mode.SUBTRACT)


solid = part.part
